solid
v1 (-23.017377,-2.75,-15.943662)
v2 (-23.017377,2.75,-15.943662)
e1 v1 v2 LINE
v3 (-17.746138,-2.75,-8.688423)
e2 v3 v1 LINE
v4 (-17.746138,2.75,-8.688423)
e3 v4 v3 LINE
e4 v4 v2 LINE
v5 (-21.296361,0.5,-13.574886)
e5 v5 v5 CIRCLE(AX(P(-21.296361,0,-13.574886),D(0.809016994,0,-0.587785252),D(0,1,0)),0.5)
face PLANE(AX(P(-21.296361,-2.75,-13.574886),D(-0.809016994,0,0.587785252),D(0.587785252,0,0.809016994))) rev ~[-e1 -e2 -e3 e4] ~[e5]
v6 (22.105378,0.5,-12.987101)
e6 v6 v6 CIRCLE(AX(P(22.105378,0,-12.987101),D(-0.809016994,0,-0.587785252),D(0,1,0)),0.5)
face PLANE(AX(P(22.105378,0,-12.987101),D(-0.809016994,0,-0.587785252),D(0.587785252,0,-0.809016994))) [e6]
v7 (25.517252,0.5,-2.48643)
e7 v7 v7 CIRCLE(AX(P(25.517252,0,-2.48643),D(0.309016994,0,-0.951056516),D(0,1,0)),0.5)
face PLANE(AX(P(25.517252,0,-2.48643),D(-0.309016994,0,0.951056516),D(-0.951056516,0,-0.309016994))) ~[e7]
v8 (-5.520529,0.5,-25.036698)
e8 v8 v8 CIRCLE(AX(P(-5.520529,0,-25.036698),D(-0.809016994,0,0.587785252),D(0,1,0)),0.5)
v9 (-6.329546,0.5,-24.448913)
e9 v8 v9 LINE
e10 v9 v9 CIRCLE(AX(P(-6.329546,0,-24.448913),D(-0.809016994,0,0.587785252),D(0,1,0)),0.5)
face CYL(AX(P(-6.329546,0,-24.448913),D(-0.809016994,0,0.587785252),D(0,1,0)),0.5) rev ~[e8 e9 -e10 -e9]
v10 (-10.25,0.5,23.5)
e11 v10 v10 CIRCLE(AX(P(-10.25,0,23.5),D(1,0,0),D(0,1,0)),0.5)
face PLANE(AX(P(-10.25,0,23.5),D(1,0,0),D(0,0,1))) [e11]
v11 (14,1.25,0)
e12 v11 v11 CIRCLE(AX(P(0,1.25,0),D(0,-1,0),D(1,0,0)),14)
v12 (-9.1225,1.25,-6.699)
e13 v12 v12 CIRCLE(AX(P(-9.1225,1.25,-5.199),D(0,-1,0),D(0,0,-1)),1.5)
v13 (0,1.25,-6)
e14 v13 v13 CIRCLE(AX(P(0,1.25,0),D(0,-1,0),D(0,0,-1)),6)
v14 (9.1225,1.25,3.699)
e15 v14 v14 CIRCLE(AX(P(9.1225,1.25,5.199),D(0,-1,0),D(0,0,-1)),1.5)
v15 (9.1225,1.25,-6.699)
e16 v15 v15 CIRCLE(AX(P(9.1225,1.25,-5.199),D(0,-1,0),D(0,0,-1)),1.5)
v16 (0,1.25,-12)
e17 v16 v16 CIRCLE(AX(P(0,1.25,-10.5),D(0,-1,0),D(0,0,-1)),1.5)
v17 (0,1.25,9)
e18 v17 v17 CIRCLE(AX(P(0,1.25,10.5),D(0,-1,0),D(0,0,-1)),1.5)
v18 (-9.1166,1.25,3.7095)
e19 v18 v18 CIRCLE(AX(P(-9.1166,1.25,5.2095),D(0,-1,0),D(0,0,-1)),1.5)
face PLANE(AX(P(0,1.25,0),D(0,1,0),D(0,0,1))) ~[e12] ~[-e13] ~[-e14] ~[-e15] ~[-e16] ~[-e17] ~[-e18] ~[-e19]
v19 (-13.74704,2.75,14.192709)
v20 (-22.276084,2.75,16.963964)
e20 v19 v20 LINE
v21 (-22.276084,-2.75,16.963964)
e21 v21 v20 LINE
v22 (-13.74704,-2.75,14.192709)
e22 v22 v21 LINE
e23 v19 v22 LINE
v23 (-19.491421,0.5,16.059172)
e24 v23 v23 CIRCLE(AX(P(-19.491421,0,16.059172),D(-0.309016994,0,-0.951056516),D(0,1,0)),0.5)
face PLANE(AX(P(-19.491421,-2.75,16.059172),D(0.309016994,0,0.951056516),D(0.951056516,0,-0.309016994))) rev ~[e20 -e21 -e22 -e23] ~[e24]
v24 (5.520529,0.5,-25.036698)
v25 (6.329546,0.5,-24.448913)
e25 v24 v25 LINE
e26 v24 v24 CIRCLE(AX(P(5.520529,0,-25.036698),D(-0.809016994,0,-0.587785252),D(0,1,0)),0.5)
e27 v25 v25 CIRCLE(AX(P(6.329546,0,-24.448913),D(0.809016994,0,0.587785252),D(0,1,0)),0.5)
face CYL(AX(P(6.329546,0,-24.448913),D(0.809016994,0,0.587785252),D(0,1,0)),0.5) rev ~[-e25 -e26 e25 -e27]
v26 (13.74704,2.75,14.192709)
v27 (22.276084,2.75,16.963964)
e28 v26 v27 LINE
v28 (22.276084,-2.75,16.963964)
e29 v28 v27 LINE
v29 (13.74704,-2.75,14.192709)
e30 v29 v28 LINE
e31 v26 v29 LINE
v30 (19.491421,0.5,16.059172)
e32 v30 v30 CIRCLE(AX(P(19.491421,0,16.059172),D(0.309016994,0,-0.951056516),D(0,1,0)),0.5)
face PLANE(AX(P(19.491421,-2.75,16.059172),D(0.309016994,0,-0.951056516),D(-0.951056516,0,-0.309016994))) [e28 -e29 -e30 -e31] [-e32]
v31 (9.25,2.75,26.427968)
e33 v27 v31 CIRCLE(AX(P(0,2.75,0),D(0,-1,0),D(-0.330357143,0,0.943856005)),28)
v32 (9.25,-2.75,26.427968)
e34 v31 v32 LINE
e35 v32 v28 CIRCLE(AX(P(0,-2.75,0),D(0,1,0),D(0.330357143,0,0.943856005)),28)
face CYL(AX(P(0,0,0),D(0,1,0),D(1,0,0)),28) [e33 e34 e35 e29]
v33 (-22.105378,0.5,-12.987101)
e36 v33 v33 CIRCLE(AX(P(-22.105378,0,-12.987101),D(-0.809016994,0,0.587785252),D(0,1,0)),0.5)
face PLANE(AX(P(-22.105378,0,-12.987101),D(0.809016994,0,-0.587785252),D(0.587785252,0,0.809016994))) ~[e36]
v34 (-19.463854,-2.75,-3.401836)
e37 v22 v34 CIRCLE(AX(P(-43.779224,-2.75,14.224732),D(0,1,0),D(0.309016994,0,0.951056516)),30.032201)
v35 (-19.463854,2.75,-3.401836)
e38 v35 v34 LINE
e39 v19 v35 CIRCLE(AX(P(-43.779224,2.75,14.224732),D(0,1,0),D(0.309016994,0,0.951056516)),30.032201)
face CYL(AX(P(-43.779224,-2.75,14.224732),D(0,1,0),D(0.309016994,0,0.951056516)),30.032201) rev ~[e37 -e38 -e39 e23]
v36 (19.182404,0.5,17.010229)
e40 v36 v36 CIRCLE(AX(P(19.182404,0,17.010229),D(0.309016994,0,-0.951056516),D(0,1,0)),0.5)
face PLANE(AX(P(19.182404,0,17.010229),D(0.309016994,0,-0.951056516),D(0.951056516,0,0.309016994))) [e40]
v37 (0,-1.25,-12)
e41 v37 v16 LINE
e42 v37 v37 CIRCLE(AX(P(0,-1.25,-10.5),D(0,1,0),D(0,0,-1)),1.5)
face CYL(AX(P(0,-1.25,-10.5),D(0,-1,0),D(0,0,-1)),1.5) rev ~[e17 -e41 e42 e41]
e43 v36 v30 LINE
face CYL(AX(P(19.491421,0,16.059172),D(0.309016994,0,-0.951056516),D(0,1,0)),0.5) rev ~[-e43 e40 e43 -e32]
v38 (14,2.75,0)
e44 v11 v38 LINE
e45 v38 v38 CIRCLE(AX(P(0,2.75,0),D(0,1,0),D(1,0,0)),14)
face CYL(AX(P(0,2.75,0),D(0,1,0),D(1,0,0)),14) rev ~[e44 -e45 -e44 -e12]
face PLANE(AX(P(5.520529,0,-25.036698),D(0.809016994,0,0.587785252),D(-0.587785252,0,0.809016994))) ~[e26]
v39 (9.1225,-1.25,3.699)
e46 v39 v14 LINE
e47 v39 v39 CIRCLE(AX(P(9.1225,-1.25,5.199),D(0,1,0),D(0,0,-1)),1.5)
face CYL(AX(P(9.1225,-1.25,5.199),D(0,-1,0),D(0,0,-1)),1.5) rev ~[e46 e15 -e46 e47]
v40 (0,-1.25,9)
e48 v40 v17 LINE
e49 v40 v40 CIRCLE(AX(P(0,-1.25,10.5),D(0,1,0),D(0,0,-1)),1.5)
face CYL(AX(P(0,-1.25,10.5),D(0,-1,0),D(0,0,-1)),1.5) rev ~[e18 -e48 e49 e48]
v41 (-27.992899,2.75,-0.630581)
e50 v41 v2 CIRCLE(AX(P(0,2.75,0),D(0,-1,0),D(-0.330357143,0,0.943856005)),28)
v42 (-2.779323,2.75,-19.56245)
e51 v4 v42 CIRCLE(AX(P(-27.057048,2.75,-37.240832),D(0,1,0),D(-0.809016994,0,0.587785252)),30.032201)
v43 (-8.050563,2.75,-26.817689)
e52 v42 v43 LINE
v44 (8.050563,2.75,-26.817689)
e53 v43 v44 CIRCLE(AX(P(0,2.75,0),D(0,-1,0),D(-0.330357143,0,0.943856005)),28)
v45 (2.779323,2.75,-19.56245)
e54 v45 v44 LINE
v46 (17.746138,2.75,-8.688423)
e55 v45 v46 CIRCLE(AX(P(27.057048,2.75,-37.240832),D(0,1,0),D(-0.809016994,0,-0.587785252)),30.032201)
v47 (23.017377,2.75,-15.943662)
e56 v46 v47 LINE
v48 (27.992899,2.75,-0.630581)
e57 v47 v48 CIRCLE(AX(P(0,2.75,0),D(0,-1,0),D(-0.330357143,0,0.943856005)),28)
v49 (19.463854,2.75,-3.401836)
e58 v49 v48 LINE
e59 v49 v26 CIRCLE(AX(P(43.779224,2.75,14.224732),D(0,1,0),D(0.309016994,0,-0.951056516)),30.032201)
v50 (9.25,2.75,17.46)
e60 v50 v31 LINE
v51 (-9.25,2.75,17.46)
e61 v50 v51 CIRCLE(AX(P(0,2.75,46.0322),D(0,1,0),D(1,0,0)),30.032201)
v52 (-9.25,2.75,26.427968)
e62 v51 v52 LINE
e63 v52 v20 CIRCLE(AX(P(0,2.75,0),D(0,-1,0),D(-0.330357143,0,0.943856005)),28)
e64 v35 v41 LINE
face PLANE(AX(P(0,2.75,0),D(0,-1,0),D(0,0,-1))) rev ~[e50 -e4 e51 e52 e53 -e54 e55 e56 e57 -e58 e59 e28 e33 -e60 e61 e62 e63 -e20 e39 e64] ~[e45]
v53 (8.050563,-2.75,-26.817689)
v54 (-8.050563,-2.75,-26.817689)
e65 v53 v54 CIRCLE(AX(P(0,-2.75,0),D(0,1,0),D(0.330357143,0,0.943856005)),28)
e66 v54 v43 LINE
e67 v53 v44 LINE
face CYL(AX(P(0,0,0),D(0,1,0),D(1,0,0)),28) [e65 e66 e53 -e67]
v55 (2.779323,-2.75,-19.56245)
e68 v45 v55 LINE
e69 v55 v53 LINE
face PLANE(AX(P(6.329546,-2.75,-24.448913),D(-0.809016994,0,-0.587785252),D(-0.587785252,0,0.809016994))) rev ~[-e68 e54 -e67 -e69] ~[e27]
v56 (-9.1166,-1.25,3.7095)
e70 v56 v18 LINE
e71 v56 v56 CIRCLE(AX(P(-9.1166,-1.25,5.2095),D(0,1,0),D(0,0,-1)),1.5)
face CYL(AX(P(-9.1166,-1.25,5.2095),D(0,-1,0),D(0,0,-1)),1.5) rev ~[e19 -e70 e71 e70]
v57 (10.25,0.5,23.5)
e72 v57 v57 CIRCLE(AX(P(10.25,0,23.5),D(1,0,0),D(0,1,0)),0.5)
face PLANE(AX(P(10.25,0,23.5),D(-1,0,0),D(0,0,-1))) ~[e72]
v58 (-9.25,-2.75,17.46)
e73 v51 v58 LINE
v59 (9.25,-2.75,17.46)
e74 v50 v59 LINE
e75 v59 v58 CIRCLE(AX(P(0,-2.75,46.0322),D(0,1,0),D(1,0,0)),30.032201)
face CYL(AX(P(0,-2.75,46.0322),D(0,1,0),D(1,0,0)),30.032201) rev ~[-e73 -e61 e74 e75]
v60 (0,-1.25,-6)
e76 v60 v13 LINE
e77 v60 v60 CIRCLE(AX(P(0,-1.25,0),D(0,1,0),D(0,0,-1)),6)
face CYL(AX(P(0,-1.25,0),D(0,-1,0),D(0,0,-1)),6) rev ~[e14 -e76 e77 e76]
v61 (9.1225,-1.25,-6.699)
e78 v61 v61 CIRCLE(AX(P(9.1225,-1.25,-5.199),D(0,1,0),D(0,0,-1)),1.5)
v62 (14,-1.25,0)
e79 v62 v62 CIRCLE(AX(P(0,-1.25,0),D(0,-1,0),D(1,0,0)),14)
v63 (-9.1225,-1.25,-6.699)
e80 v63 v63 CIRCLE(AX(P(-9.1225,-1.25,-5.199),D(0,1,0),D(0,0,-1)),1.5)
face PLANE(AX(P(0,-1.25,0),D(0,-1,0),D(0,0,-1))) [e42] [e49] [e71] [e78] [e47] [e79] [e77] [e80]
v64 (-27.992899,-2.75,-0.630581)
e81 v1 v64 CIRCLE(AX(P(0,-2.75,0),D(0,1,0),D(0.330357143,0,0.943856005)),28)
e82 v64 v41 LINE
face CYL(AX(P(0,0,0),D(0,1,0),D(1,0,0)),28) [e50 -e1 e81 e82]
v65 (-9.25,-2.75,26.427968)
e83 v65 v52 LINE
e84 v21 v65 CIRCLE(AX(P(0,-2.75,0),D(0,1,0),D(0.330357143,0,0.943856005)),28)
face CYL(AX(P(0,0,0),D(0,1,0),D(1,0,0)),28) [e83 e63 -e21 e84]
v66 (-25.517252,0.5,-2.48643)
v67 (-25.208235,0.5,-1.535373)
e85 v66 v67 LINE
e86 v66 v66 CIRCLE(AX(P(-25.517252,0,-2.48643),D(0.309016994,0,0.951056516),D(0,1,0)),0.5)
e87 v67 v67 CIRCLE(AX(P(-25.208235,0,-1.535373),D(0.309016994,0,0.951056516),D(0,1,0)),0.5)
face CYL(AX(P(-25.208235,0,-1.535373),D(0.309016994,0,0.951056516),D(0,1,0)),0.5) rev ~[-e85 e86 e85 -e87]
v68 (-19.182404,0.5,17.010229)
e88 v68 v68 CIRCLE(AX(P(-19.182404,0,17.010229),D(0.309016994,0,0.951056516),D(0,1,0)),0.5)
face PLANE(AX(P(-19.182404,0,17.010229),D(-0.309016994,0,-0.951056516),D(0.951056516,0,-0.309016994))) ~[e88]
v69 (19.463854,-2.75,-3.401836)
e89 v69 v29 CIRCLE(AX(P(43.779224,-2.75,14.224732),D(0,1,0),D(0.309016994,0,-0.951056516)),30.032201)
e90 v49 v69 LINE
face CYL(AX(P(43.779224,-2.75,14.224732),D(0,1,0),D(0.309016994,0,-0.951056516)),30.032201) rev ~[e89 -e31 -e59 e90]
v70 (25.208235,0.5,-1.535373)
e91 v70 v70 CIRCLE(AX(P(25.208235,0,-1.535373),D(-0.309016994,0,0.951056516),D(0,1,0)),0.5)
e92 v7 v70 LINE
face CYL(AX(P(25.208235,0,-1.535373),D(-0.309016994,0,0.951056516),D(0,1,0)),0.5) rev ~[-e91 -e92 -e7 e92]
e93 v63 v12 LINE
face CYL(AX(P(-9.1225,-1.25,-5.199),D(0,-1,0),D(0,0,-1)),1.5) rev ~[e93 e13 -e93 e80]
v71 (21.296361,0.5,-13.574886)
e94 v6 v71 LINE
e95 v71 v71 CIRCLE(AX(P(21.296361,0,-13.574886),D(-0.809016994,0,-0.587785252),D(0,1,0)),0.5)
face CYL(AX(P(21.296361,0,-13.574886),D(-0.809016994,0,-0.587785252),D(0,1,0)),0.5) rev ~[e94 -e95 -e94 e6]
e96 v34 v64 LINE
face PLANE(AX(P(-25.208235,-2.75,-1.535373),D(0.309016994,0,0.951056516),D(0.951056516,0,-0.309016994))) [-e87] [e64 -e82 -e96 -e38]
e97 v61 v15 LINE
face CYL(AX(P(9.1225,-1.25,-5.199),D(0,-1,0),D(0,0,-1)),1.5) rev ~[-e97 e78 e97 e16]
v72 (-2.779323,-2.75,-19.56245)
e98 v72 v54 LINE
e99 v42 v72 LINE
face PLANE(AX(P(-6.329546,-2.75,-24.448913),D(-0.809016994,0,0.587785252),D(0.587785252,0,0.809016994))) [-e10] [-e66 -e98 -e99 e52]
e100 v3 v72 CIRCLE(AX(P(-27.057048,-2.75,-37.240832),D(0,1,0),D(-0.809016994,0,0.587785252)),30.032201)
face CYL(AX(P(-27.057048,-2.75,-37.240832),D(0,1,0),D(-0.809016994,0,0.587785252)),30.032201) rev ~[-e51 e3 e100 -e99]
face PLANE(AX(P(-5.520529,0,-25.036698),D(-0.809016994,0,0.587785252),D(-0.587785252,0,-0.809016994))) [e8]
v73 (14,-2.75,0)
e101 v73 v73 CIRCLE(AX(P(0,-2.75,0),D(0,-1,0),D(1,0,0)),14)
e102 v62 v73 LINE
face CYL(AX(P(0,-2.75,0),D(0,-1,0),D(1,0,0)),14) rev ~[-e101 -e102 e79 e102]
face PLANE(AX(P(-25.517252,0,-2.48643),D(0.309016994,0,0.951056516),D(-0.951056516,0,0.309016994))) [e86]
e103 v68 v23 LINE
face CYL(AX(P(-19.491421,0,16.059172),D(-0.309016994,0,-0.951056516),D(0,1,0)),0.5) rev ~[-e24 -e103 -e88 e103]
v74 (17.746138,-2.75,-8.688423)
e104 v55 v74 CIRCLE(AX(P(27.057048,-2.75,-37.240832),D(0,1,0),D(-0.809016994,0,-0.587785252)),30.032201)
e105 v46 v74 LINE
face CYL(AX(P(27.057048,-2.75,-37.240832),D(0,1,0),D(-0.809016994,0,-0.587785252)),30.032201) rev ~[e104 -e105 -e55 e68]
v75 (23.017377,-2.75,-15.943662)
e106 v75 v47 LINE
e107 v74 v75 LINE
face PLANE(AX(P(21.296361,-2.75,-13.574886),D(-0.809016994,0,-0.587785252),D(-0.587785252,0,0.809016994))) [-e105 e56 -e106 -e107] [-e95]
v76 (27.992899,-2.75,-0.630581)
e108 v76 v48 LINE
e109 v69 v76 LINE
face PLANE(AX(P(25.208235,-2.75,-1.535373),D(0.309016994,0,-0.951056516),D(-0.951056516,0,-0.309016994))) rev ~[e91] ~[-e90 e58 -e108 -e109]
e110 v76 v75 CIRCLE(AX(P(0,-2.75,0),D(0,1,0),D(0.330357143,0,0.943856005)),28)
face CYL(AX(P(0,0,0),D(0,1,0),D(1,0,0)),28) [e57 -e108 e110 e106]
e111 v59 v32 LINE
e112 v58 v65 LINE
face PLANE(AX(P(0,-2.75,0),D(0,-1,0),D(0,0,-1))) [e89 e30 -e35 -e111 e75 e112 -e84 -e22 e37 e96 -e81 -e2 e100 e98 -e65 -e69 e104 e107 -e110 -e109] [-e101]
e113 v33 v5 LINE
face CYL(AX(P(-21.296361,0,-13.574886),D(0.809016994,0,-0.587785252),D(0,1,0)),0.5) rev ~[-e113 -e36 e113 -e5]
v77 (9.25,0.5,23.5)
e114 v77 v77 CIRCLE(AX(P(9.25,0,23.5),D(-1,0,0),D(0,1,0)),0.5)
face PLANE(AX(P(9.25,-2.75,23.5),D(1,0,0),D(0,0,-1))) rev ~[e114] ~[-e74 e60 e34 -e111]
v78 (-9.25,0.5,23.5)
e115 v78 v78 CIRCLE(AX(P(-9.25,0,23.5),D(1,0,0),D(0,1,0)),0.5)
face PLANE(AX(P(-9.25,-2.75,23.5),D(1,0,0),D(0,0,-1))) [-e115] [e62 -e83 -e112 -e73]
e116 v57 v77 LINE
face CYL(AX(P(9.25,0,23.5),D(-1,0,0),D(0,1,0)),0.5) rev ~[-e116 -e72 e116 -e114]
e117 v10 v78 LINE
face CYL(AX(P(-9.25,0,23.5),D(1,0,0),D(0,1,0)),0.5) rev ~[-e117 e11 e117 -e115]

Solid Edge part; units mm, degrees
sketch "Sketch1" plane through (0, 0, 0) normal (0, -1, 0) x (1, 0, 0)
  circle A0 centre (0, 0) radius 28
extrude "Protrusion1" add sketch "Sketch1" along normal mid plane 5.5
sketch "Sketch2" plane through (0, -2.75, 0) normal (0, -1, 0) x (1, 0, 0)
  circle A0 centre (0, 0) radius 14
extrude "Extrusionsausschnitt_1" cut sketch "Sketch2" against normal blind 1.5 and the other way blind 1.5
mirror "Mirror1" about plane through (0, 0, 0) normal (0, -1, 0) of "Extrusionsausschnitt_1"
hole "Bohrung_1" at (-9.1166, -1.25, 5.2095) direction (0, 1, 0) diameter 3 end up to next
hole "Hole1" at (0, -1.25, 10.5) direction (0, 1, 0) diameter 3 end up to next
hole "Hole2" at (9.1225, -1.25, 5.199) direction (0, 1, 0) diameter 3 end up to next
hole "Hole3" at (9.1225, -1.25, -5.199) direction (0, 1, 0) diameter 3 end up to next
hole "Hole4" at (0, -1.25, -10.5) direction (0, 1, 0) diameter 3 end up to next
hole "Hole5" at (-9.1225, -1.25, -5.199) direction (0, 1, 0) diameter 3 end up to next
sketch "Sketch3" plane through (0, -2.75, 0) normal (0, -1, 0) x (1, 0, 0)
  line L0 (-9.25, 23.5) -> (-9.25, 17.46)
  arc A0 (-9.25, 17.46) -> (9.25, 17.46) centre (0, 46.0322) ccw
  line L1 (9.25, 23.5) -> (9.25, 17.46)
  line L2 (9.25, 23.5) -> (9.25, 28.54)
  arc A1 (-9.25, 28.54) -> (9.25, 28.54) centre (0, -0.0322) cw
  line L3 (-9.25, 23.5) -> (-9.25, 28.54)
extrude "Extrusionsausschnitt_3" cut sketch "Sketch3" along normal mid plane 52.8693
pattern_circular "Muster_1" count 5 over 360 about axis through (0, -2.75, 0) along (0, 1, 0) of "Extrusionsausschnitt_3"
sketch "Sketch4" plane through (-9.25, 0, 21.944) normal (1, 0, 0) x (0, 1, 0)
  circle A0 centre (0, 1.556) radius 0.5
extrude "Extrusionsausschnitt_8" cut sketch "Sketch4" against normal blind 1 and the other way blind 1
mirror "Mirror2" about plane through (0, 0, 0) normal (1, 0, 0) of "Extrusionsausschnitt_8"
pattern_circular "Pattern1" count 5 over 360 about axis through (0, -2.75, 0) along (0, 1, 0) of "Extrusionsausschnitt_8", "Mirror2"
hole "Bohrung_7" at (0, -1.25, 0) direction (0, 1, 0) diameter 12 end up to next
properties material "Wheel2"
